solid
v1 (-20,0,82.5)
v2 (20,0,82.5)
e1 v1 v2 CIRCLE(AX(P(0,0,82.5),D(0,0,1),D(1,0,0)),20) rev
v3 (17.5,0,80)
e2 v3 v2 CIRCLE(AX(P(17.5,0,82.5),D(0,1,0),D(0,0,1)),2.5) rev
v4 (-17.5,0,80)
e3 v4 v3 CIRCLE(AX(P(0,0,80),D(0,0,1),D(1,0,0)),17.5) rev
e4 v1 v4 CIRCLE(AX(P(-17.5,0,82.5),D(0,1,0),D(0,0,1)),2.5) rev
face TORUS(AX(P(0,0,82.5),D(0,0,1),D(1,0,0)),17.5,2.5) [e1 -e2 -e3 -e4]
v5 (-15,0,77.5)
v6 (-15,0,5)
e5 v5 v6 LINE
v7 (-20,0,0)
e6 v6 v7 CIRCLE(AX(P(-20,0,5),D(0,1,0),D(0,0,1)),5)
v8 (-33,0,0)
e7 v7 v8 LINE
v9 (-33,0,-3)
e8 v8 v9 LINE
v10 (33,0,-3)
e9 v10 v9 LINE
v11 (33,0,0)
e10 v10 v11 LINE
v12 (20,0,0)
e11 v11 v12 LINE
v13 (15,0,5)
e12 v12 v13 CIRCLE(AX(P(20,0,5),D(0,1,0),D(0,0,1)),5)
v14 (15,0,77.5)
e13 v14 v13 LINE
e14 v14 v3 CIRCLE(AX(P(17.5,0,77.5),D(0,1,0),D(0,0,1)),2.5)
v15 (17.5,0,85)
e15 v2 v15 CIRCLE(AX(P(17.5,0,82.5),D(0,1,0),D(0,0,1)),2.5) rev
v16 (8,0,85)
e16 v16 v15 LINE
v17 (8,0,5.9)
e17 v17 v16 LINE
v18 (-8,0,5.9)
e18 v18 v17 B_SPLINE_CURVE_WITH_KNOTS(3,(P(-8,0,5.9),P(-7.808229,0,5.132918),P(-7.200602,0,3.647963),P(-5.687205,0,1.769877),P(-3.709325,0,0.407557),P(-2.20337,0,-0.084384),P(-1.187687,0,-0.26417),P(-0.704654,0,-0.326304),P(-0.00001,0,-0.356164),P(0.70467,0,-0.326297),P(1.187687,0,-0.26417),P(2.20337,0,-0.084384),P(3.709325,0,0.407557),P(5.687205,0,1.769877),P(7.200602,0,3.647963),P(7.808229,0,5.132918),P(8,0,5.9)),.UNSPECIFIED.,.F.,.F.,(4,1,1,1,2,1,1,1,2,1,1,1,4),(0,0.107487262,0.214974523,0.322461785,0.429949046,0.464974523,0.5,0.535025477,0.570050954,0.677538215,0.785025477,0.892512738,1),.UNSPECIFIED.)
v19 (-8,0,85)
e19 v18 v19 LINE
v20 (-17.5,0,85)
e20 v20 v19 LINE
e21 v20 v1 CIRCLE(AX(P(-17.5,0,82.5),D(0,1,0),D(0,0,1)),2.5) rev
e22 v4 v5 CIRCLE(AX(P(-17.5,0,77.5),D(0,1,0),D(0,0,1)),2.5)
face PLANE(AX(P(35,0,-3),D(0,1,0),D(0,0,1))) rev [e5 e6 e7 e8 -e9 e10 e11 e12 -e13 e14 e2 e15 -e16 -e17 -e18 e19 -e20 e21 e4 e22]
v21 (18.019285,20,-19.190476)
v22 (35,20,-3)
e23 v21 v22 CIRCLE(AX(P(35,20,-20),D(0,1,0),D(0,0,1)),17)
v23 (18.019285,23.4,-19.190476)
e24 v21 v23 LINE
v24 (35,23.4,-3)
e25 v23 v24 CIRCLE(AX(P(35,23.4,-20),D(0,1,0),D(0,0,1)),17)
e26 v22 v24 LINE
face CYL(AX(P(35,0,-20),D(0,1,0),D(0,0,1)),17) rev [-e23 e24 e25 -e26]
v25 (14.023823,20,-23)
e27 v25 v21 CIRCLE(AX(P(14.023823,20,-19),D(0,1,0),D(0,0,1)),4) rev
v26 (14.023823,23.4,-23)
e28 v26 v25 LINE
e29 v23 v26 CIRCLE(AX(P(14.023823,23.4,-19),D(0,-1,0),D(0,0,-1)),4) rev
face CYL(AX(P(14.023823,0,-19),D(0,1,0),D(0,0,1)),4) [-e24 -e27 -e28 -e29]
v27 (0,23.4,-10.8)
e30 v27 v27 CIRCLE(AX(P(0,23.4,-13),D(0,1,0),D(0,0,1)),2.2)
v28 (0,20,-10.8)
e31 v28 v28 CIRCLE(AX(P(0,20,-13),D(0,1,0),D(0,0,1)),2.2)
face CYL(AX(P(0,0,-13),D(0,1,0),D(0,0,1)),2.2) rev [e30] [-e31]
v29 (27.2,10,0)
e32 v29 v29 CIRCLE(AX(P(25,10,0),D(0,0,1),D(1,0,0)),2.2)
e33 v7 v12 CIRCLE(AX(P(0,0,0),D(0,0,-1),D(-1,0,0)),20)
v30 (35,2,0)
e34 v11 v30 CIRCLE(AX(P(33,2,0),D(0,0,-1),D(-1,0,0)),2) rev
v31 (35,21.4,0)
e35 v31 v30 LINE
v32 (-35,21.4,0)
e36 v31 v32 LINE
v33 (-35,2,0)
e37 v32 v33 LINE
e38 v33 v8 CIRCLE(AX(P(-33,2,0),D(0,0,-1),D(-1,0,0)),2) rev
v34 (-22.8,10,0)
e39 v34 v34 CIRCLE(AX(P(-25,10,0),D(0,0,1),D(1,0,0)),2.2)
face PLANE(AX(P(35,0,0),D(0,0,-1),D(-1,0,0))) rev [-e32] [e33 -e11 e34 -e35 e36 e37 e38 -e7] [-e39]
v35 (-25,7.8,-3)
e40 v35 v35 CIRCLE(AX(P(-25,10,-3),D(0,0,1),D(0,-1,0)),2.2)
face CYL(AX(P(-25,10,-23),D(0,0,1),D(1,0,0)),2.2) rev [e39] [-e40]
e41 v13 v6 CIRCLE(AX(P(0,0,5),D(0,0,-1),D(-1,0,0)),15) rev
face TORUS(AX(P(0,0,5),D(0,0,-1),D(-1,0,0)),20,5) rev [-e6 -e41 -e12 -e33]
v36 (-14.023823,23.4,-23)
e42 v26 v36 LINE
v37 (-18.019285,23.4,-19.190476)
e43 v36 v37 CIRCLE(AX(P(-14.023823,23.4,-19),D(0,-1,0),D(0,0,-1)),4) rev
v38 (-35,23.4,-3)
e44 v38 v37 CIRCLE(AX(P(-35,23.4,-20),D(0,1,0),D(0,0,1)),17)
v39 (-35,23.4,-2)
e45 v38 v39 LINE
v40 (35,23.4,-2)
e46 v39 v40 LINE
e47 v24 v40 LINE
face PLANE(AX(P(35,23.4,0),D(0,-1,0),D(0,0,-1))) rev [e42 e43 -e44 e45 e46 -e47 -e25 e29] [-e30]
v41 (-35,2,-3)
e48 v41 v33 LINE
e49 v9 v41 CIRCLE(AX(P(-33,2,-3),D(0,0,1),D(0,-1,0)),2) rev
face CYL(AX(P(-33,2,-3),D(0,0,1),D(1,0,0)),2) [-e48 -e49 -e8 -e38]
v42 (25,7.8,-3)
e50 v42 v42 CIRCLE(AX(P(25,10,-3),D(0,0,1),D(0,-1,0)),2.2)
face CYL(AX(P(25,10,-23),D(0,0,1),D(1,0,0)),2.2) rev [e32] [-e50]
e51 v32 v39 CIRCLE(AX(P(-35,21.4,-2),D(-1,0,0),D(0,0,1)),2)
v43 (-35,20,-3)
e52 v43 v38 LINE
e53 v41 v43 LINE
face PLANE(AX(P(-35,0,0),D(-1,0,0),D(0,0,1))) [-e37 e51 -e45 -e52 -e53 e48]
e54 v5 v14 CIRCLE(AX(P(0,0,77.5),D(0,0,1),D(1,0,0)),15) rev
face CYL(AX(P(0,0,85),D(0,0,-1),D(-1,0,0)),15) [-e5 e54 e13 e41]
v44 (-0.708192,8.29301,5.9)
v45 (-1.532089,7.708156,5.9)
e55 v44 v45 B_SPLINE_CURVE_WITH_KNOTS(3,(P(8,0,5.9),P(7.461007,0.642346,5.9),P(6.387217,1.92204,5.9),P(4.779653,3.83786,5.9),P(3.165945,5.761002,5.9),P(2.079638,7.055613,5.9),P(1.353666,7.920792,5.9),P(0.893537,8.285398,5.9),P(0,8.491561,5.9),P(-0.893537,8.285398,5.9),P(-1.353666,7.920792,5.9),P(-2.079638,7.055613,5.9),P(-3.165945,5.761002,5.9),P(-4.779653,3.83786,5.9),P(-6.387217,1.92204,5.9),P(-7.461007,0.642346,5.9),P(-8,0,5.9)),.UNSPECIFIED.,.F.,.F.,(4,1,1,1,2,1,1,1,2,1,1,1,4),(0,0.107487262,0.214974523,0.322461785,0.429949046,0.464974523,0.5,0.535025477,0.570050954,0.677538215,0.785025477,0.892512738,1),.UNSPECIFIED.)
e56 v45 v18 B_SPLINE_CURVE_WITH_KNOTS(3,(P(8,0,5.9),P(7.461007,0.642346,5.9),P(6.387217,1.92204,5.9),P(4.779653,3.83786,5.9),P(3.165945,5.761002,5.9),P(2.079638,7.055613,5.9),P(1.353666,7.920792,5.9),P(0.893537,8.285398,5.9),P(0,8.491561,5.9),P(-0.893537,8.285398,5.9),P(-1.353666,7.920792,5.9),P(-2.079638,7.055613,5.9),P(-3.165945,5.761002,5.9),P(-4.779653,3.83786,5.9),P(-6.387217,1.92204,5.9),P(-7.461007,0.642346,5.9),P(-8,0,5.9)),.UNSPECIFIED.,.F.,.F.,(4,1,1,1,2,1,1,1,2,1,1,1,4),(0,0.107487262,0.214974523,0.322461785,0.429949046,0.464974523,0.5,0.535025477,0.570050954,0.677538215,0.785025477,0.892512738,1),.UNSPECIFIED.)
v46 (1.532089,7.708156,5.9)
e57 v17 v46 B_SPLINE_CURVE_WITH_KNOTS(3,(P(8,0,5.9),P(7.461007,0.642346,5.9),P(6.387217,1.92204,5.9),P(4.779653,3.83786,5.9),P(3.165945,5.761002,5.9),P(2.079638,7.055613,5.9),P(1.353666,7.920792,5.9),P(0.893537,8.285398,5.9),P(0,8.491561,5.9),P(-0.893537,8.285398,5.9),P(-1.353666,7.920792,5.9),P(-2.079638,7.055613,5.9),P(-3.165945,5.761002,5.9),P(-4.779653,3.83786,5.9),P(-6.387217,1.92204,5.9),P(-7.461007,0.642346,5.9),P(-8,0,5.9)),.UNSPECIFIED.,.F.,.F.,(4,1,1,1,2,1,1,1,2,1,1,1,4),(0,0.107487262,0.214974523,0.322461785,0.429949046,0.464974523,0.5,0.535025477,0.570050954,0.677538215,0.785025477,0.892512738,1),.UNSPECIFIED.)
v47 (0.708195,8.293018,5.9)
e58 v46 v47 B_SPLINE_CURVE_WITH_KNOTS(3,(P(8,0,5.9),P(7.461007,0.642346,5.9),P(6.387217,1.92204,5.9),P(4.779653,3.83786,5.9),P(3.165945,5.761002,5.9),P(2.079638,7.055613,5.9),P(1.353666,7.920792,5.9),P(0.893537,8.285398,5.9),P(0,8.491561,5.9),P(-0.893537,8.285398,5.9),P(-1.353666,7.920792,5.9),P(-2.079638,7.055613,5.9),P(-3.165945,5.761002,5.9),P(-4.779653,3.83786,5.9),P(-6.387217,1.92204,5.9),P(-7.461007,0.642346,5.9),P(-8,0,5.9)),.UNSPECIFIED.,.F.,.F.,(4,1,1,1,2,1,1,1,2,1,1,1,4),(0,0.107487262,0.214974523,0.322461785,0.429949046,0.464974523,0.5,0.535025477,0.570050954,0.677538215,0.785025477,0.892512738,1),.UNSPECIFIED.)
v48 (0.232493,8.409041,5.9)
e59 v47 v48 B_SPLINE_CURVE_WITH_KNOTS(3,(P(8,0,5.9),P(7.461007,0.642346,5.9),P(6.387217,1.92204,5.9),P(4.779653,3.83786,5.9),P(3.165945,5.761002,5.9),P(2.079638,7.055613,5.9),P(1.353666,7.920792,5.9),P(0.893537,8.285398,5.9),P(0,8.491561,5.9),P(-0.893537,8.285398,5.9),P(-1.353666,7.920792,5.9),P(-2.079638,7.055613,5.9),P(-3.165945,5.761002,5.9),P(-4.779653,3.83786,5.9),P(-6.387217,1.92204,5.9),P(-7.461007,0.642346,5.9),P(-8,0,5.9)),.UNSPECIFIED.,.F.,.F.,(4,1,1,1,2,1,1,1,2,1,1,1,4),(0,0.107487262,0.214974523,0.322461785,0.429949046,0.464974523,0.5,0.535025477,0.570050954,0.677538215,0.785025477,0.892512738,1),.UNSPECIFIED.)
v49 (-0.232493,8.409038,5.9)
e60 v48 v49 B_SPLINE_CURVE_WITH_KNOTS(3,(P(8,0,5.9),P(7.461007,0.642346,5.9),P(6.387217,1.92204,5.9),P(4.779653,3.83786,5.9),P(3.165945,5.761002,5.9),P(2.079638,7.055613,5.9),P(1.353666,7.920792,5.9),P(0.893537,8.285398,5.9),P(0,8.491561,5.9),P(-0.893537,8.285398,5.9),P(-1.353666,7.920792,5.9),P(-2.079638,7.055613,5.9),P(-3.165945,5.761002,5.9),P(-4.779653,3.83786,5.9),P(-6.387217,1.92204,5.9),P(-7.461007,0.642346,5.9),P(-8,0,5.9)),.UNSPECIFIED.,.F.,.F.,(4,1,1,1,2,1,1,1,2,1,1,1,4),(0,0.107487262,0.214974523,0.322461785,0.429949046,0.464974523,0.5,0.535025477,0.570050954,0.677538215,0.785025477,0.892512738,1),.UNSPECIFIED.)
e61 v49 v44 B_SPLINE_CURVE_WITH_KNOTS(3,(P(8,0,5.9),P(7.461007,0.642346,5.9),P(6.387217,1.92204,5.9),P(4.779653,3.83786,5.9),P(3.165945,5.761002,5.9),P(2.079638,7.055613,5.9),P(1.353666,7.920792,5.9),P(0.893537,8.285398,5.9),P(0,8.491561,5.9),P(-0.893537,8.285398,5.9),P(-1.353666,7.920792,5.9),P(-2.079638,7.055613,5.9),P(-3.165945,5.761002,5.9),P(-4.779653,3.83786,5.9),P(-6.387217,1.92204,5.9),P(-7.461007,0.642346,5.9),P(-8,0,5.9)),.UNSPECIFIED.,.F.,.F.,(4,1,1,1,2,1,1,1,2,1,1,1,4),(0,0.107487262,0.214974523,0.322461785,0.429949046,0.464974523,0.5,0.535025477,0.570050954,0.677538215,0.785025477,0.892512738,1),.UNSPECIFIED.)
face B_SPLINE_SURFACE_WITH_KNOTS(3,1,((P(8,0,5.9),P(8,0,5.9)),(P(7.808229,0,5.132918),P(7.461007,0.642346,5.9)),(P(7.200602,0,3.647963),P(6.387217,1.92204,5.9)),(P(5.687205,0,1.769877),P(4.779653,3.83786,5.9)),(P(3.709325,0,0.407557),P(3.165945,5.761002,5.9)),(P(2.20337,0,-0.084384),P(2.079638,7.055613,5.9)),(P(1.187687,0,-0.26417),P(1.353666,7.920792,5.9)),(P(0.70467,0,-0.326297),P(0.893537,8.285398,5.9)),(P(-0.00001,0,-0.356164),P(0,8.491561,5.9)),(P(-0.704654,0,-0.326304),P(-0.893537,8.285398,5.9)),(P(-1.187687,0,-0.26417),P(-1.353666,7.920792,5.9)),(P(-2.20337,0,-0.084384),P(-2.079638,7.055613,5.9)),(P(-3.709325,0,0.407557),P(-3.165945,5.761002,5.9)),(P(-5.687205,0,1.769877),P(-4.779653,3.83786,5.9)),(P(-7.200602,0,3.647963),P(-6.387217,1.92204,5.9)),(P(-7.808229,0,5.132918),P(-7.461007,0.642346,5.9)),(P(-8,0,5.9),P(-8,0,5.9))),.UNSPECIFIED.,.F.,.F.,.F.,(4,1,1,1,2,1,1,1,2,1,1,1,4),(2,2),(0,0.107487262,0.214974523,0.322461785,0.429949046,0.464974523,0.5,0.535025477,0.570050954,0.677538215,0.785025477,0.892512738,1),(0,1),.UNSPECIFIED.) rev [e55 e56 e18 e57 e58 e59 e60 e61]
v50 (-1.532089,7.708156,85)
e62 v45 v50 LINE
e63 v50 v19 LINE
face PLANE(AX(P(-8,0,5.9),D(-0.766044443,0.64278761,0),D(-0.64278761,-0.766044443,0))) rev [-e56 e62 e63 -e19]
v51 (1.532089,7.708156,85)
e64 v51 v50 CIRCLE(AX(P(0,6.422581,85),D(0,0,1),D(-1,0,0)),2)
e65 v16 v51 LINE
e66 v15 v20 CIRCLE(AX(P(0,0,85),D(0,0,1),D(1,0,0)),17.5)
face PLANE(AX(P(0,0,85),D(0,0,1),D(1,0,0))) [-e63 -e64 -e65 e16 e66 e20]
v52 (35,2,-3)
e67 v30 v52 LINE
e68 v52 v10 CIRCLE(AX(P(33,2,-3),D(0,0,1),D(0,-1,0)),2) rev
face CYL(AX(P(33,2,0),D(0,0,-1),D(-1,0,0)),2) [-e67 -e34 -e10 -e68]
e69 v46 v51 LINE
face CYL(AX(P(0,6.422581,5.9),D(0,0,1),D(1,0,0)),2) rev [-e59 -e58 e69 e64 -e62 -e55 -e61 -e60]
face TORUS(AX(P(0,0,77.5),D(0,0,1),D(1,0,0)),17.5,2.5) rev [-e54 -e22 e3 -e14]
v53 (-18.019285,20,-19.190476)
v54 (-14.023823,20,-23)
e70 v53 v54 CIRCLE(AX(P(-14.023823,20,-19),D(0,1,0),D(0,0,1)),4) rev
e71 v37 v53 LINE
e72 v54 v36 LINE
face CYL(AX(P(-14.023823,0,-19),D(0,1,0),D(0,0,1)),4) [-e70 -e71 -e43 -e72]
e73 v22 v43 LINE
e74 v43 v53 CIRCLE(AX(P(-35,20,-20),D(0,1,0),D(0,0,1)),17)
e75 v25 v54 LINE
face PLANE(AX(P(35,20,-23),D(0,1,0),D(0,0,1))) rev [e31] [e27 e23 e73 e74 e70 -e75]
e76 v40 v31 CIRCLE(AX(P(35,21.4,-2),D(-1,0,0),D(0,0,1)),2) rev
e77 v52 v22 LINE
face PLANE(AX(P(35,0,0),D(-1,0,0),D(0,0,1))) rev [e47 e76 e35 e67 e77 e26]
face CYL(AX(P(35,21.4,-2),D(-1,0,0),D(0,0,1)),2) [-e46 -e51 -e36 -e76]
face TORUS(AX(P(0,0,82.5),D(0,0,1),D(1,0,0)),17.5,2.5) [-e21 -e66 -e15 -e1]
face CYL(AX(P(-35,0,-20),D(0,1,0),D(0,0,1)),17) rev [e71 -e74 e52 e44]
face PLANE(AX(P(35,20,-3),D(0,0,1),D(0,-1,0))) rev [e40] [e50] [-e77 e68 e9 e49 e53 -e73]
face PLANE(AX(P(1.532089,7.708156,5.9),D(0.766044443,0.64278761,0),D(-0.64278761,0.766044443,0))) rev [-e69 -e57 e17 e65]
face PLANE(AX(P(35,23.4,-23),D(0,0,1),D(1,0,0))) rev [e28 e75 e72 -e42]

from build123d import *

# Parameters (mm, degrees)
BOSS_EXTRUDE1_DEPTH = 35
CUT_EXTRUDE1_DEPTH  = 48.974576601
FILLET1_R           = 4
SKETCH3_R           = 2.2
CUT_EXTRUDE2_DEPTH  = 48.974576601
BOSS_EXTRUDE2_DEPTH = 85
FILLET2_R           = 2
FILLET3_R           = 5
BOSS_EXTRUDE3_DEPTH = 5
FILLET4_R           = 2.5
SKETCH6_R           = 2.2
CUT_EXTRUDE3_DEPTH  = 95.855469004
CUT_EXTRUDE4_DEPTH  = 79.1


with BuildPart() as part:
    # Sketch1 → Boss-Extrude1 (new, symmetric)
    with BuildSketch(Plane(origin=(0, 0, 0), x_dir=(0, 0, -1), z_dir=(1, 0, 0))):
        Polygon((0, 0), (0, 23.4), (23, 23.4), (23, 20), (3, 20), (3, 0), align=None)
    extrude(amount=BOSS_EXTRUDE1_DEPTH, both=True)

    # Sketch2 → Cut-Extrude1 (cut, through all)
    with BuildSketch(Plane(origin=(0, 23.4, 0), x_dir=(1, 0, 0), z_dir=(0, 1, 0))):
        with BuildLine():
            Line((-35, 3), (-35, 23))
            Line((-35, 23), (-18.266799469, 23))
            ThreePointArc((-18.266799469, 23), (-21.96159519, 9.091287885), (-35, 3))
        make_face()
        with BuildLine():
            Line((35, 23), (35, 3))
            ThreePointArc((35, 3), (21.96159519, 9.091287885), (18.266799469, 23))
            Line((18.266799469, 23), (35, 23))
        make_face()
    extrude(amount=-CUT_EXTRUDE1_DEPTH, mode=Mode.SUBTRACT)

    # Fillet1
    fillet1_edges = [part.edges().sort_by_distance(p)[0] for p in [
        (-18.266799469, 21.7, -23),
        (18.266799469, 21.7, -23),
    ]]
    fillet(fillet1_edges, radius=FILLET1_R)

    # Sketch3 → Cut-Extrude2 (cut, through all)
    with BuildSketch(Plane(origin=(0, 23.4, 0), x_dir=(1, 0, 0), z_dir=(0, 1, 0))):
        with Locations(Location((0, 13, 0), (0, 0, 270))):
            Circle(SKETCH3_R)
    extrude(amount=-CUT_EXTRUDE2_DEPTH, mode=Mode.SUBTRACT)

    # Sketch4 → Boss-Extrude2 (add)
    with BuildSketch(Plane.XY):
        with BuildLine():
            Line((-15, 0), (15, 0))
            ThreePointArc((15, 0), (0, 15), (-15, 0))
        make_face()
    extrude(amount=BOSS_EXTRUDE2_DEPTH)

    # Fillet2
    fillet2_edges = [part.edges().sort_by_distance(p)[0] for p in [
        (0, 23.4, 0),
        (35, 0, -1.5),
        (-35, 0, -1.5),
    ]]
    fillet(fillet2_edges, radius=FILLET2_R)

    # Fillet3
    fillet3_edges = [part.edges().sort_by_distance(p)[0] for p in [
        (0, 15, 0),
    ]]
    fillet(fillet3_edges, radius=FILLET3_R)

    # Sketch5 → Boss-Extrude3 (add)
    with BuildSketch(Plane.XY.offset(85)):
        with BuildLine():
            Line((-20, 0), (20, 0))
            ThreePointArc((20, 0), (0, 20), (-20, 0))
        make_face()
    extrude(amount=-BOSS_EXTRUDE3_DEPTH)

    # Fillet4
    fillet4_edges = [part.edges().sort_by_distance(p)[0] for p in [
        (0, 15, 80),
        (0, 20, 85),
        (0, 20, 80),
    ]]
    fillet(fillet4_edges, radius=FILLET4_R - 0.0001)  # a hair under: the kernel refuses the full size

    # Sketch6 → Cut-Extrude3 (cut, through all)
    with BuildSketch(Plane.XY):
        with Locations((-25, 10)):
            Circle(SKETCH6_R)
        with Locations((25, 10)):
            Circle(SKETCH6_R)
    extrude(amount=-CUT_EXTRUDE3_DEPTH, mode=Mode.SUBTRACT)

    # Sketch7 → Cut-Extrude4 (cut)
    with BuildSketch(Plane.XY.offset(85)):
        with BuildLine():
            Line((-8, 0), (-1.532088886, 7.708156306))
            ThreePointArc((-1.532088886, 7.708156306), (0, 8.422581087), (1.532088886, 7.708156306))
            Line((1.532088886, 7.708156306), (8, 0))
            Line((8, 0), (-8, 0))
        make_face()
    extrude(amount=-CUT_EXTRUDE4_DEPTH, mode=Mode.SUBTRACT)

    # Cut-Loft1: read off the stored shape, not the designer's step
    # Cut-Loft1: loft between two sections, ruled curve by curve
    cut_loft1_from = [
        Edge.make_bspline([(8, 0, 5.9), (7.808229478, 0, 5.132917912), (7.200602425, 0, 3.64796349), (5.687204842, 0, 1.769877251), (3.709324875, 0, 0.407557368), (2.203369637, 0, -0.084384364), (1.187686781, 0, -0.264169601), (0.704669985, 0, -0.326297117), (-9.712e-06, 0, -0.356163583), (-0.70465377, 0, -0.326303947), (-1.187686781, 0, -0.264169601), (-2.203369637, 0, -0.084384364), (-3.709324875, 0, 0.407557368), (-5.687204842, 0, 1.769877251), (-7.200602425, 0, 3.64796349), (-7.808229478, 0, 5.132917912), (-8, 0, 5.9)], [0, 0, 0, 0, 0.107487262, 0.214974523, 0.322461785, 0.429949046, 0.429949046, 0.464974523, 0.5, 0.535025477, 0.570050954, 0.570050954, 0.677538215, 0.785025477, 0.892512738, 1, 1, 1, 1], 3),
        Edge.make_line((-8, 0, 5.9), (8, 0, 5.9)),
    ]
    cut_loft1_to = [
        Edge.make_bspline([(8, 0, 5.9), (7.461007407, 0.642346359, 5.9), (6.387217166, 1.922039736, 5.9), (4.779653043, 3.837860055, 5.9), (3.165945257, 5.761002107, 5.9), (2.079638077, 7.055612591, 5.9), (1.35366615, 7.920792244, 5.9), (0.893536846, 8.285398196, 5.9), (0, 8.491560625, 5.9), (-0.893536846, 8.285398196, 5.9), (-1.35366615, 7.920792244, 5.9), (-2.079638077, 7.055612591, 5.9), (-3.165945257, 5.761002107, 5.9), (-4.779653043, 3.837860055, 5.9), (-6.387217166, 1.922039736, 5.9), (-7.461007407, 0.642346359, 5.9), (-8, 0, 5.9)], [0, 0, 0, 0, 0.107487262, 0.214974523, 0.322461785, 0.429949046, 0.429949046, 0.464974523, 0.5, 0.535025477, 0.570050954, 0.570050954, 0.677538215, 0.785025477, 0.892512738, 1, 1, 1, 1], 3),
        Edge.make_line((-8, 0, 5.9), (8, 0, 5.9)),
    ]
    cut_loft1 = Solid(Shell([*[Face.make_surface_from_curves(cut_loft1_from[k], cut_loft1_to[k]) for k in range(2)], Face(Wire(cut_loft1_from)), Face(Wire(cut_loft1_to))]))
    add(cut_loft1, mode=Mode.SUBTRACT)


solid = part.part
